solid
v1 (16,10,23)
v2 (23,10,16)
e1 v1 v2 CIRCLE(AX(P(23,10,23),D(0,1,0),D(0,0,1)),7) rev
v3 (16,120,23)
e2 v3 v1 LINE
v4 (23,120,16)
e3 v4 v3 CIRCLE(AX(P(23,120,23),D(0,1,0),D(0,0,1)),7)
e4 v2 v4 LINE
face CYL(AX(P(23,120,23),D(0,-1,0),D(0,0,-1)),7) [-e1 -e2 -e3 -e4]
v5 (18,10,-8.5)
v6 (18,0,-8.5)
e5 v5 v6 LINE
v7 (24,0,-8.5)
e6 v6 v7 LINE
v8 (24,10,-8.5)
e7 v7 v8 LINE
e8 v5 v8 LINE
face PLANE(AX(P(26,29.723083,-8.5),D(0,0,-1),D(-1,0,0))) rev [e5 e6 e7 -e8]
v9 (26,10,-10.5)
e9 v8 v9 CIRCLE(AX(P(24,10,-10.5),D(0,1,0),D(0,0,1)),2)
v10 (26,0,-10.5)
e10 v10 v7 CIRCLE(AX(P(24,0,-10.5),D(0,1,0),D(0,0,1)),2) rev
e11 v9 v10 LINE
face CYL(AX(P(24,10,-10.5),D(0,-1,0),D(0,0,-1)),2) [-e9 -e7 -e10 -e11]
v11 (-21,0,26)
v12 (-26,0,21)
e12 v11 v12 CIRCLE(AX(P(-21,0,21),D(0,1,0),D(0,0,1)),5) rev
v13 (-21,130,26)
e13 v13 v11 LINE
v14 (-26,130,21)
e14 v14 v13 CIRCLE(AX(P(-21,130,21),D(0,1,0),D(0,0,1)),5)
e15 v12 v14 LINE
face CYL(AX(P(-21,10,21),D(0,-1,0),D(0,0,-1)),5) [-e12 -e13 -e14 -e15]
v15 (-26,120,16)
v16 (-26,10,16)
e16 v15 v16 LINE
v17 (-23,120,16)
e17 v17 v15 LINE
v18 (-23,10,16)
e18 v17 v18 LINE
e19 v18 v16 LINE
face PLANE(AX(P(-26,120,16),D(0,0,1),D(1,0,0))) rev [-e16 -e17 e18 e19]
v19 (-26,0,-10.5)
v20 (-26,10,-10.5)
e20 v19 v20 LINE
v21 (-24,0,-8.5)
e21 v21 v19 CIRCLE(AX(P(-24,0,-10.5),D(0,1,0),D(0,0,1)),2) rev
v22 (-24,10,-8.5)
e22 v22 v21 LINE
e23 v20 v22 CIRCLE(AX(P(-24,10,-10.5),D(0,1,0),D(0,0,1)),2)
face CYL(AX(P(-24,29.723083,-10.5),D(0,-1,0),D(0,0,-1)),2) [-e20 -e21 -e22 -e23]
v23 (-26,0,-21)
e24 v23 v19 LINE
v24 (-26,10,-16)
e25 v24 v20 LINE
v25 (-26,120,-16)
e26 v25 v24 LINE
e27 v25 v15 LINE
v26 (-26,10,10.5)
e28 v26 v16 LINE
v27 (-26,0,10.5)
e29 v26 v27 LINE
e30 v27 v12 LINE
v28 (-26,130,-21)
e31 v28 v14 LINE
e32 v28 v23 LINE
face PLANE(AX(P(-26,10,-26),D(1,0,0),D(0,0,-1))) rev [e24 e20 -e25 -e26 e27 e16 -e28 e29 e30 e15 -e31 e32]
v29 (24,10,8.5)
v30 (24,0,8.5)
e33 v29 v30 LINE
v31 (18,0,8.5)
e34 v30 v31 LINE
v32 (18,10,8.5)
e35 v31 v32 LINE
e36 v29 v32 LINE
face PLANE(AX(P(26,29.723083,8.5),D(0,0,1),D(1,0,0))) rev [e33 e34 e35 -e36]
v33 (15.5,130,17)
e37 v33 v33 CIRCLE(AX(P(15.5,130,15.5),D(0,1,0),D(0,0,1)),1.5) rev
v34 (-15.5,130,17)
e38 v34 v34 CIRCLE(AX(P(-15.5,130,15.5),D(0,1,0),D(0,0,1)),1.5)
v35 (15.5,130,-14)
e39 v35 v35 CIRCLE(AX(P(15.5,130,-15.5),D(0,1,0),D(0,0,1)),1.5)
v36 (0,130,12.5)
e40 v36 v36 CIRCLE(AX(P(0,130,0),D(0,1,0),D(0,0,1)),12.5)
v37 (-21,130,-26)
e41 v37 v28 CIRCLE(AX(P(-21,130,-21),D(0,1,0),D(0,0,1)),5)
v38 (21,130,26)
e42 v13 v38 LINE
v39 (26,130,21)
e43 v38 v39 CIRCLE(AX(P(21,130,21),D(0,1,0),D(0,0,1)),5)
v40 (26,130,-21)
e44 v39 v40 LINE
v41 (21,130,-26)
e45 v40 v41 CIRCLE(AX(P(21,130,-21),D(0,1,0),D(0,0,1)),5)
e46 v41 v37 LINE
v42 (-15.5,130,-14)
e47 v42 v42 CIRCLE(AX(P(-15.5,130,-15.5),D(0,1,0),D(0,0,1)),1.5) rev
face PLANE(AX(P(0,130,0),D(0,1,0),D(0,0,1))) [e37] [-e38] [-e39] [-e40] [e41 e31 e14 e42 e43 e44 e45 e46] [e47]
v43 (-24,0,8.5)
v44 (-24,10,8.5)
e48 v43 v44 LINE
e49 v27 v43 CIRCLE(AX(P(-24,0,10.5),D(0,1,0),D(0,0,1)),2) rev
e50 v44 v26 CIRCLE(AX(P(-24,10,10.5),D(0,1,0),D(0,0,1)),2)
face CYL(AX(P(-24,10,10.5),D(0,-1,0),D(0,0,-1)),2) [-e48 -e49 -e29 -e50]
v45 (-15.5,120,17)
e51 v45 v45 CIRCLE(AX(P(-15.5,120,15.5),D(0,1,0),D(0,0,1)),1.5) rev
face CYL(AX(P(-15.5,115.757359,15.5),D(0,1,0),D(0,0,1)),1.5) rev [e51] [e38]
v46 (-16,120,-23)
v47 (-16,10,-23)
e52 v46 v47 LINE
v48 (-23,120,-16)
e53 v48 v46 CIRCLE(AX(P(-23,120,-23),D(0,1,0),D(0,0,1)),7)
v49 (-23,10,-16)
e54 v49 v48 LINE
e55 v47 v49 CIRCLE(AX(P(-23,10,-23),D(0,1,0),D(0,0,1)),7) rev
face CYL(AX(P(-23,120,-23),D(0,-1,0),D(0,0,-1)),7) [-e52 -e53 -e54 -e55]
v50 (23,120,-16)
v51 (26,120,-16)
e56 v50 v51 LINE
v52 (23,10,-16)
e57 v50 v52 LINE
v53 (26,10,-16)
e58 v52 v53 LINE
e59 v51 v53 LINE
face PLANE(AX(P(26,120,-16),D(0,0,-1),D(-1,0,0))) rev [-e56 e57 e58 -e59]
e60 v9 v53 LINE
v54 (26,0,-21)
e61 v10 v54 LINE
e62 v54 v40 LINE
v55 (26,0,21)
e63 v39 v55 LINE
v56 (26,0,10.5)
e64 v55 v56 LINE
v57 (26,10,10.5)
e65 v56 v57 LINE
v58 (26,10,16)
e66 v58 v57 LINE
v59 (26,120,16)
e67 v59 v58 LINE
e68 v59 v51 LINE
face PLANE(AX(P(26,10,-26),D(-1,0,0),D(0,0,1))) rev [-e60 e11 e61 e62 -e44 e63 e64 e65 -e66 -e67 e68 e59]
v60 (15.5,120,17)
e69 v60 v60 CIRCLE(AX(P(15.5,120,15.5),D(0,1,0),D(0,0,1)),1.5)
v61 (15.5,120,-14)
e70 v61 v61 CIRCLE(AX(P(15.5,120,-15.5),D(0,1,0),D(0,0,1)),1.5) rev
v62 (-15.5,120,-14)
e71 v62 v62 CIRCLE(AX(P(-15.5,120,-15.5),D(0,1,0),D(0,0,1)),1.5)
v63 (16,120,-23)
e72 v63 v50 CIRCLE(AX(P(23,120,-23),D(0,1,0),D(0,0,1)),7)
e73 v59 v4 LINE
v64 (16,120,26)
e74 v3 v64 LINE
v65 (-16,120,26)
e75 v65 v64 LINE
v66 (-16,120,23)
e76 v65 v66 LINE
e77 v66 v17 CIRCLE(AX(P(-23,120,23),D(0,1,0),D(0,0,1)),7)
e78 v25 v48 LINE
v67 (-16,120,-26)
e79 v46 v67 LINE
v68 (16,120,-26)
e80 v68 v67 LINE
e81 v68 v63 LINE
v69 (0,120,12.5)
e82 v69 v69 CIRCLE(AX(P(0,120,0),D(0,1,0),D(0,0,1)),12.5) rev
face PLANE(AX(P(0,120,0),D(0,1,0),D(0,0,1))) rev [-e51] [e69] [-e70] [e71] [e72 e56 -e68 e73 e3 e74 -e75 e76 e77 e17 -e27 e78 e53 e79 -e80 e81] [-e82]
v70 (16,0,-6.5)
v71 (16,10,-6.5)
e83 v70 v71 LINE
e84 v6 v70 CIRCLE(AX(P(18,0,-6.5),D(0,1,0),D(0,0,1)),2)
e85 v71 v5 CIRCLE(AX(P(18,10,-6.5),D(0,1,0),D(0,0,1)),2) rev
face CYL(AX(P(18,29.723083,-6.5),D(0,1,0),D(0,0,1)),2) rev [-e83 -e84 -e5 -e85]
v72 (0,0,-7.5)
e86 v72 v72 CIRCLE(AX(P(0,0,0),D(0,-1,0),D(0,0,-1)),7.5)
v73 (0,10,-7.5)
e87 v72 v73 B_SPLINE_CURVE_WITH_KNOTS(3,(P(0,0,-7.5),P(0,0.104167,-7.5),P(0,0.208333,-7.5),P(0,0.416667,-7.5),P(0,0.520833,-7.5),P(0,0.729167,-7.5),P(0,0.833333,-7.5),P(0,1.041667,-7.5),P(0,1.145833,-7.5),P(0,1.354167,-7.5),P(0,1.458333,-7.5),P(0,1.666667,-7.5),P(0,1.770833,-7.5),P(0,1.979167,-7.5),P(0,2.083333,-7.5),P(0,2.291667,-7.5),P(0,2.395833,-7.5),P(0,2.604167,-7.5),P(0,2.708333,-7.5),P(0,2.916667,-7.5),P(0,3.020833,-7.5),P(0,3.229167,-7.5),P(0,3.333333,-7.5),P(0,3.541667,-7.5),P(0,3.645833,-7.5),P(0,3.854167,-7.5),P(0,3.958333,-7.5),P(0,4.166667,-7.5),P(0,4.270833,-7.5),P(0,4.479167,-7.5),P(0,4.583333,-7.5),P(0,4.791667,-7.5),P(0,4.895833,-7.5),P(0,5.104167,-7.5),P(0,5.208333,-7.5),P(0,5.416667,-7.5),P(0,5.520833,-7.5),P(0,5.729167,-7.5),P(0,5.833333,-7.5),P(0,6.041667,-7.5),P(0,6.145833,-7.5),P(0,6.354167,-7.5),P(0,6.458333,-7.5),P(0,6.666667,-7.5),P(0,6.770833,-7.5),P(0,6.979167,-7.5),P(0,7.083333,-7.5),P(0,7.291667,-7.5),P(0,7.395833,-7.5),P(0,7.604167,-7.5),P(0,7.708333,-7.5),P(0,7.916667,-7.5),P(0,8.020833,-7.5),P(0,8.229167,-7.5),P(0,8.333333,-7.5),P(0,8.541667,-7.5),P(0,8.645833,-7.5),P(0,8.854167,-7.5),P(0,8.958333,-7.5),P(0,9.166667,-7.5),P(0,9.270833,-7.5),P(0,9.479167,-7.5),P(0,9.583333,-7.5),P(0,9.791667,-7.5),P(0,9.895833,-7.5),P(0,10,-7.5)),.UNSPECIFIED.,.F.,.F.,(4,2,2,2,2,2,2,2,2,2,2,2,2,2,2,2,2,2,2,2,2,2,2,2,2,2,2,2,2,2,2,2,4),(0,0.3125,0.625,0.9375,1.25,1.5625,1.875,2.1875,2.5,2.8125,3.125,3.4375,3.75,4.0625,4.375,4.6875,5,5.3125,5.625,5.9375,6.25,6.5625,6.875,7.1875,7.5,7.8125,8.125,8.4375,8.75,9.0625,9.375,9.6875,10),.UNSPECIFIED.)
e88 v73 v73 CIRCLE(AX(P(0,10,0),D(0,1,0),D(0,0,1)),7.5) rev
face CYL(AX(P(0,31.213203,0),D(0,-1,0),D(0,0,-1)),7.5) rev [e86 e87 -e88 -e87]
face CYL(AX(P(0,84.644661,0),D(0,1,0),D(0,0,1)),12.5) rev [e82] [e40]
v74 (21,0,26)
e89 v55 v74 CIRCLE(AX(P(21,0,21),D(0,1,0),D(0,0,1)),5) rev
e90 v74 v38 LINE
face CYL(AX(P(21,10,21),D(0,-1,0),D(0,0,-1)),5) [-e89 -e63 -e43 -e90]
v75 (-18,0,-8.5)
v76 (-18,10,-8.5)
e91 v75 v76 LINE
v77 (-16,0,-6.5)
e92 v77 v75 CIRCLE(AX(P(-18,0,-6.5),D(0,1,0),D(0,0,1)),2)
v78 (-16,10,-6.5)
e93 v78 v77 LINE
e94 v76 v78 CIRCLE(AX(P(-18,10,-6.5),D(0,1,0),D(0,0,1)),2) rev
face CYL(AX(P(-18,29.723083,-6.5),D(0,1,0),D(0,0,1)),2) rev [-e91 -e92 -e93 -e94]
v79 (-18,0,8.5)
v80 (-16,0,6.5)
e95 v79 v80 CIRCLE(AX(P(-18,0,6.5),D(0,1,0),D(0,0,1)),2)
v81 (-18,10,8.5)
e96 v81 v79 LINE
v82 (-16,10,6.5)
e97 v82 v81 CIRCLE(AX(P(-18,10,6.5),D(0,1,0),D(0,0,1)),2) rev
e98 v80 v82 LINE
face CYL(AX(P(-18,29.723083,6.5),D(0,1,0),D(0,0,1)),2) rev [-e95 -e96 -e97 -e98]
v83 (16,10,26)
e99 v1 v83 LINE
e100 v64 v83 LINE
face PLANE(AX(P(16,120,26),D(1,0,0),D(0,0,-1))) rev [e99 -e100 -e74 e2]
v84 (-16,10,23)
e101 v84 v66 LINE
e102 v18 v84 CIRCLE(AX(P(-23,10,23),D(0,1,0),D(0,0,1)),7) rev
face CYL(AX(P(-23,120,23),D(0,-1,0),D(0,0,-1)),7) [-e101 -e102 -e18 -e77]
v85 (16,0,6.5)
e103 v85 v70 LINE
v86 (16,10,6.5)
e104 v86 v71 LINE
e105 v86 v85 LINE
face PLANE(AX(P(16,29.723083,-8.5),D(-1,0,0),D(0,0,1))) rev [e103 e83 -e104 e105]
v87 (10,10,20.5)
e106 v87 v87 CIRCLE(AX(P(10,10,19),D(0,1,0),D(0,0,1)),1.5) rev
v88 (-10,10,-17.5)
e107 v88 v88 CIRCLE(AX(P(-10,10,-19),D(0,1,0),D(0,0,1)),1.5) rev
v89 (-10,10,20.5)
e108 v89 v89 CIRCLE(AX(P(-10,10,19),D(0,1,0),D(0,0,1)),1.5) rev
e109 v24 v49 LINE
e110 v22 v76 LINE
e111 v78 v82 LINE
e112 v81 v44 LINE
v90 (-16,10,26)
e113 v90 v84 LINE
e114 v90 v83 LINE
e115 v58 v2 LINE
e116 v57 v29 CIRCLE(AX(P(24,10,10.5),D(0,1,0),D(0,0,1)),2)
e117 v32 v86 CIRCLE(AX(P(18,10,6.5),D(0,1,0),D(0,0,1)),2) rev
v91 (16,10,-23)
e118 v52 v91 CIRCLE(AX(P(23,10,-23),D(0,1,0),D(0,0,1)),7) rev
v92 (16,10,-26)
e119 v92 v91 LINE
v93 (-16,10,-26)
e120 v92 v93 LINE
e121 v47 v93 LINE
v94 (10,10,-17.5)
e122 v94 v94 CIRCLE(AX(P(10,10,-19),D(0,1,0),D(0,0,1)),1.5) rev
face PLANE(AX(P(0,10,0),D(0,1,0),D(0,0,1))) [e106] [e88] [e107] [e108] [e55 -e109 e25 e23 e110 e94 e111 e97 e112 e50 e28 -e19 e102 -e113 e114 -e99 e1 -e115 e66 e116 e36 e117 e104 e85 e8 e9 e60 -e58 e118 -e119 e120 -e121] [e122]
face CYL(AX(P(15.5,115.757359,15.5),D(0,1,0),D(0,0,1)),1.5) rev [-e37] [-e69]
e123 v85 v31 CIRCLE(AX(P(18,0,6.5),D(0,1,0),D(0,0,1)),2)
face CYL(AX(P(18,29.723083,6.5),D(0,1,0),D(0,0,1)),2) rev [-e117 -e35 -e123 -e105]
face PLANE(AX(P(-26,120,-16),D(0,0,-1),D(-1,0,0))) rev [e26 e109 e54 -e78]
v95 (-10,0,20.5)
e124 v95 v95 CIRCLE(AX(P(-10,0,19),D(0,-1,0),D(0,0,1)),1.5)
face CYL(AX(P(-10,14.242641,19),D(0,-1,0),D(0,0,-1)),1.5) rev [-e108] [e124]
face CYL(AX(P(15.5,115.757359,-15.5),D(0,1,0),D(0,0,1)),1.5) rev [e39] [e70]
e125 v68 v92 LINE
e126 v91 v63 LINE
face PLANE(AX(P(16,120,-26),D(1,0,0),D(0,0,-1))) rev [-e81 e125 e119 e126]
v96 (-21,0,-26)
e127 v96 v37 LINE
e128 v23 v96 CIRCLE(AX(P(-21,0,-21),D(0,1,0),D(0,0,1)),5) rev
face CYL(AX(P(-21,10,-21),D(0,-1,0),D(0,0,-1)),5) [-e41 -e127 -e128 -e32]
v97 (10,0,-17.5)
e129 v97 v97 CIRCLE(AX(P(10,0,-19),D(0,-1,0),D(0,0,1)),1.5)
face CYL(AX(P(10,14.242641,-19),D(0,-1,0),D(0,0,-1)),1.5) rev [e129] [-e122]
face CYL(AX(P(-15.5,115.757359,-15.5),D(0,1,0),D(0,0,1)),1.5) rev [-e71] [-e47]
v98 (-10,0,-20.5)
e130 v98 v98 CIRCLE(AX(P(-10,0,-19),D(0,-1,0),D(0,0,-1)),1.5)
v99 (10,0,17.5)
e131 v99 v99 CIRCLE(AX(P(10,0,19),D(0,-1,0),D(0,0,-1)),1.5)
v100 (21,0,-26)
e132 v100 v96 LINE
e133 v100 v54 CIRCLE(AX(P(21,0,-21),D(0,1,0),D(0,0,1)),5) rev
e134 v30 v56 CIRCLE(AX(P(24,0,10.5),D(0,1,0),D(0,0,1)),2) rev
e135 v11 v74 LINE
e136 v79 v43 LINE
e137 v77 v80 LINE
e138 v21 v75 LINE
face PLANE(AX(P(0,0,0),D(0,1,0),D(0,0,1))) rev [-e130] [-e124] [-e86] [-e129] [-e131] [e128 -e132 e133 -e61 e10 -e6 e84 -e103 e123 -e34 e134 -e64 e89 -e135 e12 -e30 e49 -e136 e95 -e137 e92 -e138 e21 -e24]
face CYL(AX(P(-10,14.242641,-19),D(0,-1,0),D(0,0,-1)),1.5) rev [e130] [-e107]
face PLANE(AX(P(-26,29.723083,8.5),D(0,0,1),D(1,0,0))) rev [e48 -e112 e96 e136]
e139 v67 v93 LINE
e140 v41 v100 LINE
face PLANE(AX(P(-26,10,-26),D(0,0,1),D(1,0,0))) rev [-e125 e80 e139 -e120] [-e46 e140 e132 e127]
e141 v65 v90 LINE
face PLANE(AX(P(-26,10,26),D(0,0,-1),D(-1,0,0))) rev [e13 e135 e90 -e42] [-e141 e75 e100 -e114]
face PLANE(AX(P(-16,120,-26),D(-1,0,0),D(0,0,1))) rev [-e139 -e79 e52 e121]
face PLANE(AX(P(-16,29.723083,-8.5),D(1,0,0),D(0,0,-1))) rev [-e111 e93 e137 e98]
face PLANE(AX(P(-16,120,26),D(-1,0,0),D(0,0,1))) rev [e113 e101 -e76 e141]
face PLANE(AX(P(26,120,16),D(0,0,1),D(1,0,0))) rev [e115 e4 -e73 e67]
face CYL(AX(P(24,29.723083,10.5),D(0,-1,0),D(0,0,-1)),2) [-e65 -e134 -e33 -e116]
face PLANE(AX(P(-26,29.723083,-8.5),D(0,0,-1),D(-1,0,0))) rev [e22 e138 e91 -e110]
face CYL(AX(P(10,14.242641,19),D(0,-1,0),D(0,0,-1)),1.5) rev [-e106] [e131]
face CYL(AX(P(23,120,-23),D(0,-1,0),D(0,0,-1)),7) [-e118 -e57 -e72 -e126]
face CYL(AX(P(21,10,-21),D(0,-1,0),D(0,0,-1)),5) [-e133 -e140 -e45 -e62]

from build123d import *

# Parameters (mm, degrees)
SKETCH1_W           = 52
SKETCH1_H           = 52
BOSS_EXTRUDE1_DEPTH = 10
SKETCH2_W           = 10
SKETCH2_H           = 10
BOSS_EXTRUDE2_DEPTH = 110
SKETCH3_W           = 52
SKETCH3_H           = 52
BOSS_EXTRUDE3_DEPTH = 10
SKETCH4_R           = 12.5
CUT_EXTRUDE1_DEPTH  = 10
SKETCH5_R           = 7.5
CUT_EXTRUDE2_DEPTH  = 10
SKETCH6_W           = 10
SKETCH6_H           = 17
CUT_EXTRUDE3_DEPTH  = 10
SKETCH7_R           = 1.5
CUT_EXTRUDE4_DEPTH  = 10
FILLET1_R           = 5
FILLET2_R           = 2
SKETCH8_R           = 1.5
CUT_EXTRUDE6_DEPTH  = 10
FILLET4_R           = 7


with BuildPart() as part:
    # Sketch1 → Boss-Extrude1 (new body)
    with BuildSketch(Plane(origin=(0, 0, 0), x_dir=(1, 0, 0), z_dir=(0, 1, 0))):
        Rectangle(SKETCH1_W, SKETCH1_H)
    extrude(amount=BOSS_EXTRUDE1_DEPTH)

    # Sketch2 → Boss-Extrude2 (add)
    with BuildSketch(Plane(origin=(0, 10, 0), x_dir=(1, 0, 0), z_dir=(0, 1, 0))):
        with Locations((-21, 21)):
            Rectangle(SKETCH2_W, SKETCH2_H)
        with Locations((21, 21)):
            Rectangle(SKETCH2_W, SKETCH2_H)
        with Locations((-21, -21)):
            Rectangle(SKETCH2_W, SKETCH2_H)
        with Locations((21, -21)):
            Rectangle(SKETCH2_W, SKETCH2_H)
    extrude(amount=BOSS_EXTRUDE2_DEPTH)

    # Sketch3 → Boss-Extrude3 (add)
    with BuildSketch(Plane(origin=(0, 120, 0), x_dir=(1, 0, 0), z_dir=(0, 1, 0))):
        Rectangle(SKETCH3_W, SKETCH3_H)
    extrude(amount=BOSS_EXTRUDE3_DEPTH)

    # Sketch4 → Cut-Extrude1 (cut)
    with BuildSketch(Plane(origin=(0, 130, 0), x_dir=(1, 0, 0), z_dir=(0, 1, 0))):
        with Locations(Location((0, 0, 0), (0, 0, 270))):
            Circle(SKETCH4_R)
    extrude(amount=-CUT_EXTRUDE1_DEPTH, mode=Mode.SUBTRACT)

    # Sketch5 → Cut-Extrude2 (cut)
    with BuildSketch(Plane.XZ):
        with Locations(Location((0, 0, 0), (0, 0, 270))):
            Circle(SKETCH5_R)
    extrude(amount=-CUT_EXTRUDE2_DEPTH, mode=Mode.SUBTRACT)

    # Sketch6 → Cut-Extrude3 (cut)
    with BuildSketch(Plane.XZ):
        with Locations((-21, 0)):
            Rectangle(SKETCH6_W, SKETCH6_H)
        with Locations((21, 0)):
            Rectangle(SKETCH6_W, SKETCH6_H)
    extrude(amount=-CUT_EXTRUDE3_DEPTH, mode=Mode.SUBTRACT)

    # Sketch7 → Cut-Extrude4 (cut)
    with BuildSketch(Plane.XZ):
        with Locations(Location((10, 19, 0), (0, 0, 270))):
            Circle(SKETCH7_R)
        with Locations(Location((-10, 19, 0), (0, 0, 90))):
            Circle(SKETCH7_R)
        with Locations(Location((10, -19, 0), (0, 0, 90))):
            Circle(SKETCH7_R)
        with Locations(Location((-10, -19, 0), (0, 0, 270))):
            Circle(SKETCH7_R)
    extrude(amount=-CUT_EXTRUDE4_DEPTH, mode=Mode.SUBTRACT)

    # Fillet1
    fillet1_edges = [part.edges().sort_by_distance(p)[0] for p in [
        (26, 65, 26),
        (-26, 65, 26),
        (-26, 65, -26),
        (26, 65, -26),
    ]]
    fillet(fillet1_edges, radius=FILLET1_R)

    # Fillet2
    fillet2_edges = [part.edges().sort_by_distance(p)[0] for p in [
        (-16, 5, -8.5),
        (-16, 5, 8.5),
        (-26, 5, 8.5),
        (-26, 5, -8.5),
        (16, 5, 8.5),
        (16, 5, -8.5),
        (26, 5, -8.5),
        (26, 5, 8.5),
    ]]
    fillet(fillet2_edges, radius=FILLET2_R)

    # Sketch8 → Cut-Extrude6 (cut)
    with BuildSketch(Plane(origin=(0, 130, 0), x_dir=(1, 0, 0), z_dir=(0, 1, 0))):
        with Locations(Location((-15.5, -15.5, 0), (0, 0, 270))):
            Circle(SKETCH8_R)
        with Locations(Location((-15.5, 15.5, 0), (0, 0, 270))):
            Circle(SKETCH8_R)
        with Locations(Location((15.5, 15.5, 0), (0, 0, 270))):
            Circle(SKETCH8_R)
        with Locations(Location((15.5, -15.5, 0), (0, 0, 270))):
            Circle(SKETCH8_R)
    extrude(amount=-CUT_EXTRUDE6_DEPTH, mode=Mode.SUBTRACT)

    # Fillet4
    # the kernel refuses this fillet: 7 mm, written as the material it takes off along each edge
    with BuildSketch(Plane(origin=(-16, 10, -16), x_dir=(-1, 0, 0), z_dir=(0, 1, 0)), Plane(origin=(16, 10, -16), x_dir=(0, 0, -1), z_dir=(0, 1, 0)), Plane(origin=(16, 10, 16), x_dir=(1, 0, 0), z_dir=(0, 1, 0))) as fillet4_piece_1:
        with BuildLine():
            CenterArc((FILLET4_R, -FILLET4_R), FILLET4_R, 90, 90)
            Line((0, -FILLET4_R), (0, 0))
            Line((0, 0), (FILLET4_R, 0))
        make_face()
    extrude(amount=110, mode=Mode.SUBTRACT)
    with BuildSketch(Plane(origin=(-16, 10, 16), x_dir=(-1, 0, 0), z_dir=(0, 1, 0))) as fillet4_piece_2:
        with BuildLine():
            CenterArc((FILLET4_R, FILLET4_R), FILLET4_R, 180, 90)
            Line((0, FILLET4_R), (0, 0))
            Line((0, 0), (FILLET4_R, 0))
        make_face()
    extrude(amount=110, mode=Mode.SUBTRACT)


solid = part.part
